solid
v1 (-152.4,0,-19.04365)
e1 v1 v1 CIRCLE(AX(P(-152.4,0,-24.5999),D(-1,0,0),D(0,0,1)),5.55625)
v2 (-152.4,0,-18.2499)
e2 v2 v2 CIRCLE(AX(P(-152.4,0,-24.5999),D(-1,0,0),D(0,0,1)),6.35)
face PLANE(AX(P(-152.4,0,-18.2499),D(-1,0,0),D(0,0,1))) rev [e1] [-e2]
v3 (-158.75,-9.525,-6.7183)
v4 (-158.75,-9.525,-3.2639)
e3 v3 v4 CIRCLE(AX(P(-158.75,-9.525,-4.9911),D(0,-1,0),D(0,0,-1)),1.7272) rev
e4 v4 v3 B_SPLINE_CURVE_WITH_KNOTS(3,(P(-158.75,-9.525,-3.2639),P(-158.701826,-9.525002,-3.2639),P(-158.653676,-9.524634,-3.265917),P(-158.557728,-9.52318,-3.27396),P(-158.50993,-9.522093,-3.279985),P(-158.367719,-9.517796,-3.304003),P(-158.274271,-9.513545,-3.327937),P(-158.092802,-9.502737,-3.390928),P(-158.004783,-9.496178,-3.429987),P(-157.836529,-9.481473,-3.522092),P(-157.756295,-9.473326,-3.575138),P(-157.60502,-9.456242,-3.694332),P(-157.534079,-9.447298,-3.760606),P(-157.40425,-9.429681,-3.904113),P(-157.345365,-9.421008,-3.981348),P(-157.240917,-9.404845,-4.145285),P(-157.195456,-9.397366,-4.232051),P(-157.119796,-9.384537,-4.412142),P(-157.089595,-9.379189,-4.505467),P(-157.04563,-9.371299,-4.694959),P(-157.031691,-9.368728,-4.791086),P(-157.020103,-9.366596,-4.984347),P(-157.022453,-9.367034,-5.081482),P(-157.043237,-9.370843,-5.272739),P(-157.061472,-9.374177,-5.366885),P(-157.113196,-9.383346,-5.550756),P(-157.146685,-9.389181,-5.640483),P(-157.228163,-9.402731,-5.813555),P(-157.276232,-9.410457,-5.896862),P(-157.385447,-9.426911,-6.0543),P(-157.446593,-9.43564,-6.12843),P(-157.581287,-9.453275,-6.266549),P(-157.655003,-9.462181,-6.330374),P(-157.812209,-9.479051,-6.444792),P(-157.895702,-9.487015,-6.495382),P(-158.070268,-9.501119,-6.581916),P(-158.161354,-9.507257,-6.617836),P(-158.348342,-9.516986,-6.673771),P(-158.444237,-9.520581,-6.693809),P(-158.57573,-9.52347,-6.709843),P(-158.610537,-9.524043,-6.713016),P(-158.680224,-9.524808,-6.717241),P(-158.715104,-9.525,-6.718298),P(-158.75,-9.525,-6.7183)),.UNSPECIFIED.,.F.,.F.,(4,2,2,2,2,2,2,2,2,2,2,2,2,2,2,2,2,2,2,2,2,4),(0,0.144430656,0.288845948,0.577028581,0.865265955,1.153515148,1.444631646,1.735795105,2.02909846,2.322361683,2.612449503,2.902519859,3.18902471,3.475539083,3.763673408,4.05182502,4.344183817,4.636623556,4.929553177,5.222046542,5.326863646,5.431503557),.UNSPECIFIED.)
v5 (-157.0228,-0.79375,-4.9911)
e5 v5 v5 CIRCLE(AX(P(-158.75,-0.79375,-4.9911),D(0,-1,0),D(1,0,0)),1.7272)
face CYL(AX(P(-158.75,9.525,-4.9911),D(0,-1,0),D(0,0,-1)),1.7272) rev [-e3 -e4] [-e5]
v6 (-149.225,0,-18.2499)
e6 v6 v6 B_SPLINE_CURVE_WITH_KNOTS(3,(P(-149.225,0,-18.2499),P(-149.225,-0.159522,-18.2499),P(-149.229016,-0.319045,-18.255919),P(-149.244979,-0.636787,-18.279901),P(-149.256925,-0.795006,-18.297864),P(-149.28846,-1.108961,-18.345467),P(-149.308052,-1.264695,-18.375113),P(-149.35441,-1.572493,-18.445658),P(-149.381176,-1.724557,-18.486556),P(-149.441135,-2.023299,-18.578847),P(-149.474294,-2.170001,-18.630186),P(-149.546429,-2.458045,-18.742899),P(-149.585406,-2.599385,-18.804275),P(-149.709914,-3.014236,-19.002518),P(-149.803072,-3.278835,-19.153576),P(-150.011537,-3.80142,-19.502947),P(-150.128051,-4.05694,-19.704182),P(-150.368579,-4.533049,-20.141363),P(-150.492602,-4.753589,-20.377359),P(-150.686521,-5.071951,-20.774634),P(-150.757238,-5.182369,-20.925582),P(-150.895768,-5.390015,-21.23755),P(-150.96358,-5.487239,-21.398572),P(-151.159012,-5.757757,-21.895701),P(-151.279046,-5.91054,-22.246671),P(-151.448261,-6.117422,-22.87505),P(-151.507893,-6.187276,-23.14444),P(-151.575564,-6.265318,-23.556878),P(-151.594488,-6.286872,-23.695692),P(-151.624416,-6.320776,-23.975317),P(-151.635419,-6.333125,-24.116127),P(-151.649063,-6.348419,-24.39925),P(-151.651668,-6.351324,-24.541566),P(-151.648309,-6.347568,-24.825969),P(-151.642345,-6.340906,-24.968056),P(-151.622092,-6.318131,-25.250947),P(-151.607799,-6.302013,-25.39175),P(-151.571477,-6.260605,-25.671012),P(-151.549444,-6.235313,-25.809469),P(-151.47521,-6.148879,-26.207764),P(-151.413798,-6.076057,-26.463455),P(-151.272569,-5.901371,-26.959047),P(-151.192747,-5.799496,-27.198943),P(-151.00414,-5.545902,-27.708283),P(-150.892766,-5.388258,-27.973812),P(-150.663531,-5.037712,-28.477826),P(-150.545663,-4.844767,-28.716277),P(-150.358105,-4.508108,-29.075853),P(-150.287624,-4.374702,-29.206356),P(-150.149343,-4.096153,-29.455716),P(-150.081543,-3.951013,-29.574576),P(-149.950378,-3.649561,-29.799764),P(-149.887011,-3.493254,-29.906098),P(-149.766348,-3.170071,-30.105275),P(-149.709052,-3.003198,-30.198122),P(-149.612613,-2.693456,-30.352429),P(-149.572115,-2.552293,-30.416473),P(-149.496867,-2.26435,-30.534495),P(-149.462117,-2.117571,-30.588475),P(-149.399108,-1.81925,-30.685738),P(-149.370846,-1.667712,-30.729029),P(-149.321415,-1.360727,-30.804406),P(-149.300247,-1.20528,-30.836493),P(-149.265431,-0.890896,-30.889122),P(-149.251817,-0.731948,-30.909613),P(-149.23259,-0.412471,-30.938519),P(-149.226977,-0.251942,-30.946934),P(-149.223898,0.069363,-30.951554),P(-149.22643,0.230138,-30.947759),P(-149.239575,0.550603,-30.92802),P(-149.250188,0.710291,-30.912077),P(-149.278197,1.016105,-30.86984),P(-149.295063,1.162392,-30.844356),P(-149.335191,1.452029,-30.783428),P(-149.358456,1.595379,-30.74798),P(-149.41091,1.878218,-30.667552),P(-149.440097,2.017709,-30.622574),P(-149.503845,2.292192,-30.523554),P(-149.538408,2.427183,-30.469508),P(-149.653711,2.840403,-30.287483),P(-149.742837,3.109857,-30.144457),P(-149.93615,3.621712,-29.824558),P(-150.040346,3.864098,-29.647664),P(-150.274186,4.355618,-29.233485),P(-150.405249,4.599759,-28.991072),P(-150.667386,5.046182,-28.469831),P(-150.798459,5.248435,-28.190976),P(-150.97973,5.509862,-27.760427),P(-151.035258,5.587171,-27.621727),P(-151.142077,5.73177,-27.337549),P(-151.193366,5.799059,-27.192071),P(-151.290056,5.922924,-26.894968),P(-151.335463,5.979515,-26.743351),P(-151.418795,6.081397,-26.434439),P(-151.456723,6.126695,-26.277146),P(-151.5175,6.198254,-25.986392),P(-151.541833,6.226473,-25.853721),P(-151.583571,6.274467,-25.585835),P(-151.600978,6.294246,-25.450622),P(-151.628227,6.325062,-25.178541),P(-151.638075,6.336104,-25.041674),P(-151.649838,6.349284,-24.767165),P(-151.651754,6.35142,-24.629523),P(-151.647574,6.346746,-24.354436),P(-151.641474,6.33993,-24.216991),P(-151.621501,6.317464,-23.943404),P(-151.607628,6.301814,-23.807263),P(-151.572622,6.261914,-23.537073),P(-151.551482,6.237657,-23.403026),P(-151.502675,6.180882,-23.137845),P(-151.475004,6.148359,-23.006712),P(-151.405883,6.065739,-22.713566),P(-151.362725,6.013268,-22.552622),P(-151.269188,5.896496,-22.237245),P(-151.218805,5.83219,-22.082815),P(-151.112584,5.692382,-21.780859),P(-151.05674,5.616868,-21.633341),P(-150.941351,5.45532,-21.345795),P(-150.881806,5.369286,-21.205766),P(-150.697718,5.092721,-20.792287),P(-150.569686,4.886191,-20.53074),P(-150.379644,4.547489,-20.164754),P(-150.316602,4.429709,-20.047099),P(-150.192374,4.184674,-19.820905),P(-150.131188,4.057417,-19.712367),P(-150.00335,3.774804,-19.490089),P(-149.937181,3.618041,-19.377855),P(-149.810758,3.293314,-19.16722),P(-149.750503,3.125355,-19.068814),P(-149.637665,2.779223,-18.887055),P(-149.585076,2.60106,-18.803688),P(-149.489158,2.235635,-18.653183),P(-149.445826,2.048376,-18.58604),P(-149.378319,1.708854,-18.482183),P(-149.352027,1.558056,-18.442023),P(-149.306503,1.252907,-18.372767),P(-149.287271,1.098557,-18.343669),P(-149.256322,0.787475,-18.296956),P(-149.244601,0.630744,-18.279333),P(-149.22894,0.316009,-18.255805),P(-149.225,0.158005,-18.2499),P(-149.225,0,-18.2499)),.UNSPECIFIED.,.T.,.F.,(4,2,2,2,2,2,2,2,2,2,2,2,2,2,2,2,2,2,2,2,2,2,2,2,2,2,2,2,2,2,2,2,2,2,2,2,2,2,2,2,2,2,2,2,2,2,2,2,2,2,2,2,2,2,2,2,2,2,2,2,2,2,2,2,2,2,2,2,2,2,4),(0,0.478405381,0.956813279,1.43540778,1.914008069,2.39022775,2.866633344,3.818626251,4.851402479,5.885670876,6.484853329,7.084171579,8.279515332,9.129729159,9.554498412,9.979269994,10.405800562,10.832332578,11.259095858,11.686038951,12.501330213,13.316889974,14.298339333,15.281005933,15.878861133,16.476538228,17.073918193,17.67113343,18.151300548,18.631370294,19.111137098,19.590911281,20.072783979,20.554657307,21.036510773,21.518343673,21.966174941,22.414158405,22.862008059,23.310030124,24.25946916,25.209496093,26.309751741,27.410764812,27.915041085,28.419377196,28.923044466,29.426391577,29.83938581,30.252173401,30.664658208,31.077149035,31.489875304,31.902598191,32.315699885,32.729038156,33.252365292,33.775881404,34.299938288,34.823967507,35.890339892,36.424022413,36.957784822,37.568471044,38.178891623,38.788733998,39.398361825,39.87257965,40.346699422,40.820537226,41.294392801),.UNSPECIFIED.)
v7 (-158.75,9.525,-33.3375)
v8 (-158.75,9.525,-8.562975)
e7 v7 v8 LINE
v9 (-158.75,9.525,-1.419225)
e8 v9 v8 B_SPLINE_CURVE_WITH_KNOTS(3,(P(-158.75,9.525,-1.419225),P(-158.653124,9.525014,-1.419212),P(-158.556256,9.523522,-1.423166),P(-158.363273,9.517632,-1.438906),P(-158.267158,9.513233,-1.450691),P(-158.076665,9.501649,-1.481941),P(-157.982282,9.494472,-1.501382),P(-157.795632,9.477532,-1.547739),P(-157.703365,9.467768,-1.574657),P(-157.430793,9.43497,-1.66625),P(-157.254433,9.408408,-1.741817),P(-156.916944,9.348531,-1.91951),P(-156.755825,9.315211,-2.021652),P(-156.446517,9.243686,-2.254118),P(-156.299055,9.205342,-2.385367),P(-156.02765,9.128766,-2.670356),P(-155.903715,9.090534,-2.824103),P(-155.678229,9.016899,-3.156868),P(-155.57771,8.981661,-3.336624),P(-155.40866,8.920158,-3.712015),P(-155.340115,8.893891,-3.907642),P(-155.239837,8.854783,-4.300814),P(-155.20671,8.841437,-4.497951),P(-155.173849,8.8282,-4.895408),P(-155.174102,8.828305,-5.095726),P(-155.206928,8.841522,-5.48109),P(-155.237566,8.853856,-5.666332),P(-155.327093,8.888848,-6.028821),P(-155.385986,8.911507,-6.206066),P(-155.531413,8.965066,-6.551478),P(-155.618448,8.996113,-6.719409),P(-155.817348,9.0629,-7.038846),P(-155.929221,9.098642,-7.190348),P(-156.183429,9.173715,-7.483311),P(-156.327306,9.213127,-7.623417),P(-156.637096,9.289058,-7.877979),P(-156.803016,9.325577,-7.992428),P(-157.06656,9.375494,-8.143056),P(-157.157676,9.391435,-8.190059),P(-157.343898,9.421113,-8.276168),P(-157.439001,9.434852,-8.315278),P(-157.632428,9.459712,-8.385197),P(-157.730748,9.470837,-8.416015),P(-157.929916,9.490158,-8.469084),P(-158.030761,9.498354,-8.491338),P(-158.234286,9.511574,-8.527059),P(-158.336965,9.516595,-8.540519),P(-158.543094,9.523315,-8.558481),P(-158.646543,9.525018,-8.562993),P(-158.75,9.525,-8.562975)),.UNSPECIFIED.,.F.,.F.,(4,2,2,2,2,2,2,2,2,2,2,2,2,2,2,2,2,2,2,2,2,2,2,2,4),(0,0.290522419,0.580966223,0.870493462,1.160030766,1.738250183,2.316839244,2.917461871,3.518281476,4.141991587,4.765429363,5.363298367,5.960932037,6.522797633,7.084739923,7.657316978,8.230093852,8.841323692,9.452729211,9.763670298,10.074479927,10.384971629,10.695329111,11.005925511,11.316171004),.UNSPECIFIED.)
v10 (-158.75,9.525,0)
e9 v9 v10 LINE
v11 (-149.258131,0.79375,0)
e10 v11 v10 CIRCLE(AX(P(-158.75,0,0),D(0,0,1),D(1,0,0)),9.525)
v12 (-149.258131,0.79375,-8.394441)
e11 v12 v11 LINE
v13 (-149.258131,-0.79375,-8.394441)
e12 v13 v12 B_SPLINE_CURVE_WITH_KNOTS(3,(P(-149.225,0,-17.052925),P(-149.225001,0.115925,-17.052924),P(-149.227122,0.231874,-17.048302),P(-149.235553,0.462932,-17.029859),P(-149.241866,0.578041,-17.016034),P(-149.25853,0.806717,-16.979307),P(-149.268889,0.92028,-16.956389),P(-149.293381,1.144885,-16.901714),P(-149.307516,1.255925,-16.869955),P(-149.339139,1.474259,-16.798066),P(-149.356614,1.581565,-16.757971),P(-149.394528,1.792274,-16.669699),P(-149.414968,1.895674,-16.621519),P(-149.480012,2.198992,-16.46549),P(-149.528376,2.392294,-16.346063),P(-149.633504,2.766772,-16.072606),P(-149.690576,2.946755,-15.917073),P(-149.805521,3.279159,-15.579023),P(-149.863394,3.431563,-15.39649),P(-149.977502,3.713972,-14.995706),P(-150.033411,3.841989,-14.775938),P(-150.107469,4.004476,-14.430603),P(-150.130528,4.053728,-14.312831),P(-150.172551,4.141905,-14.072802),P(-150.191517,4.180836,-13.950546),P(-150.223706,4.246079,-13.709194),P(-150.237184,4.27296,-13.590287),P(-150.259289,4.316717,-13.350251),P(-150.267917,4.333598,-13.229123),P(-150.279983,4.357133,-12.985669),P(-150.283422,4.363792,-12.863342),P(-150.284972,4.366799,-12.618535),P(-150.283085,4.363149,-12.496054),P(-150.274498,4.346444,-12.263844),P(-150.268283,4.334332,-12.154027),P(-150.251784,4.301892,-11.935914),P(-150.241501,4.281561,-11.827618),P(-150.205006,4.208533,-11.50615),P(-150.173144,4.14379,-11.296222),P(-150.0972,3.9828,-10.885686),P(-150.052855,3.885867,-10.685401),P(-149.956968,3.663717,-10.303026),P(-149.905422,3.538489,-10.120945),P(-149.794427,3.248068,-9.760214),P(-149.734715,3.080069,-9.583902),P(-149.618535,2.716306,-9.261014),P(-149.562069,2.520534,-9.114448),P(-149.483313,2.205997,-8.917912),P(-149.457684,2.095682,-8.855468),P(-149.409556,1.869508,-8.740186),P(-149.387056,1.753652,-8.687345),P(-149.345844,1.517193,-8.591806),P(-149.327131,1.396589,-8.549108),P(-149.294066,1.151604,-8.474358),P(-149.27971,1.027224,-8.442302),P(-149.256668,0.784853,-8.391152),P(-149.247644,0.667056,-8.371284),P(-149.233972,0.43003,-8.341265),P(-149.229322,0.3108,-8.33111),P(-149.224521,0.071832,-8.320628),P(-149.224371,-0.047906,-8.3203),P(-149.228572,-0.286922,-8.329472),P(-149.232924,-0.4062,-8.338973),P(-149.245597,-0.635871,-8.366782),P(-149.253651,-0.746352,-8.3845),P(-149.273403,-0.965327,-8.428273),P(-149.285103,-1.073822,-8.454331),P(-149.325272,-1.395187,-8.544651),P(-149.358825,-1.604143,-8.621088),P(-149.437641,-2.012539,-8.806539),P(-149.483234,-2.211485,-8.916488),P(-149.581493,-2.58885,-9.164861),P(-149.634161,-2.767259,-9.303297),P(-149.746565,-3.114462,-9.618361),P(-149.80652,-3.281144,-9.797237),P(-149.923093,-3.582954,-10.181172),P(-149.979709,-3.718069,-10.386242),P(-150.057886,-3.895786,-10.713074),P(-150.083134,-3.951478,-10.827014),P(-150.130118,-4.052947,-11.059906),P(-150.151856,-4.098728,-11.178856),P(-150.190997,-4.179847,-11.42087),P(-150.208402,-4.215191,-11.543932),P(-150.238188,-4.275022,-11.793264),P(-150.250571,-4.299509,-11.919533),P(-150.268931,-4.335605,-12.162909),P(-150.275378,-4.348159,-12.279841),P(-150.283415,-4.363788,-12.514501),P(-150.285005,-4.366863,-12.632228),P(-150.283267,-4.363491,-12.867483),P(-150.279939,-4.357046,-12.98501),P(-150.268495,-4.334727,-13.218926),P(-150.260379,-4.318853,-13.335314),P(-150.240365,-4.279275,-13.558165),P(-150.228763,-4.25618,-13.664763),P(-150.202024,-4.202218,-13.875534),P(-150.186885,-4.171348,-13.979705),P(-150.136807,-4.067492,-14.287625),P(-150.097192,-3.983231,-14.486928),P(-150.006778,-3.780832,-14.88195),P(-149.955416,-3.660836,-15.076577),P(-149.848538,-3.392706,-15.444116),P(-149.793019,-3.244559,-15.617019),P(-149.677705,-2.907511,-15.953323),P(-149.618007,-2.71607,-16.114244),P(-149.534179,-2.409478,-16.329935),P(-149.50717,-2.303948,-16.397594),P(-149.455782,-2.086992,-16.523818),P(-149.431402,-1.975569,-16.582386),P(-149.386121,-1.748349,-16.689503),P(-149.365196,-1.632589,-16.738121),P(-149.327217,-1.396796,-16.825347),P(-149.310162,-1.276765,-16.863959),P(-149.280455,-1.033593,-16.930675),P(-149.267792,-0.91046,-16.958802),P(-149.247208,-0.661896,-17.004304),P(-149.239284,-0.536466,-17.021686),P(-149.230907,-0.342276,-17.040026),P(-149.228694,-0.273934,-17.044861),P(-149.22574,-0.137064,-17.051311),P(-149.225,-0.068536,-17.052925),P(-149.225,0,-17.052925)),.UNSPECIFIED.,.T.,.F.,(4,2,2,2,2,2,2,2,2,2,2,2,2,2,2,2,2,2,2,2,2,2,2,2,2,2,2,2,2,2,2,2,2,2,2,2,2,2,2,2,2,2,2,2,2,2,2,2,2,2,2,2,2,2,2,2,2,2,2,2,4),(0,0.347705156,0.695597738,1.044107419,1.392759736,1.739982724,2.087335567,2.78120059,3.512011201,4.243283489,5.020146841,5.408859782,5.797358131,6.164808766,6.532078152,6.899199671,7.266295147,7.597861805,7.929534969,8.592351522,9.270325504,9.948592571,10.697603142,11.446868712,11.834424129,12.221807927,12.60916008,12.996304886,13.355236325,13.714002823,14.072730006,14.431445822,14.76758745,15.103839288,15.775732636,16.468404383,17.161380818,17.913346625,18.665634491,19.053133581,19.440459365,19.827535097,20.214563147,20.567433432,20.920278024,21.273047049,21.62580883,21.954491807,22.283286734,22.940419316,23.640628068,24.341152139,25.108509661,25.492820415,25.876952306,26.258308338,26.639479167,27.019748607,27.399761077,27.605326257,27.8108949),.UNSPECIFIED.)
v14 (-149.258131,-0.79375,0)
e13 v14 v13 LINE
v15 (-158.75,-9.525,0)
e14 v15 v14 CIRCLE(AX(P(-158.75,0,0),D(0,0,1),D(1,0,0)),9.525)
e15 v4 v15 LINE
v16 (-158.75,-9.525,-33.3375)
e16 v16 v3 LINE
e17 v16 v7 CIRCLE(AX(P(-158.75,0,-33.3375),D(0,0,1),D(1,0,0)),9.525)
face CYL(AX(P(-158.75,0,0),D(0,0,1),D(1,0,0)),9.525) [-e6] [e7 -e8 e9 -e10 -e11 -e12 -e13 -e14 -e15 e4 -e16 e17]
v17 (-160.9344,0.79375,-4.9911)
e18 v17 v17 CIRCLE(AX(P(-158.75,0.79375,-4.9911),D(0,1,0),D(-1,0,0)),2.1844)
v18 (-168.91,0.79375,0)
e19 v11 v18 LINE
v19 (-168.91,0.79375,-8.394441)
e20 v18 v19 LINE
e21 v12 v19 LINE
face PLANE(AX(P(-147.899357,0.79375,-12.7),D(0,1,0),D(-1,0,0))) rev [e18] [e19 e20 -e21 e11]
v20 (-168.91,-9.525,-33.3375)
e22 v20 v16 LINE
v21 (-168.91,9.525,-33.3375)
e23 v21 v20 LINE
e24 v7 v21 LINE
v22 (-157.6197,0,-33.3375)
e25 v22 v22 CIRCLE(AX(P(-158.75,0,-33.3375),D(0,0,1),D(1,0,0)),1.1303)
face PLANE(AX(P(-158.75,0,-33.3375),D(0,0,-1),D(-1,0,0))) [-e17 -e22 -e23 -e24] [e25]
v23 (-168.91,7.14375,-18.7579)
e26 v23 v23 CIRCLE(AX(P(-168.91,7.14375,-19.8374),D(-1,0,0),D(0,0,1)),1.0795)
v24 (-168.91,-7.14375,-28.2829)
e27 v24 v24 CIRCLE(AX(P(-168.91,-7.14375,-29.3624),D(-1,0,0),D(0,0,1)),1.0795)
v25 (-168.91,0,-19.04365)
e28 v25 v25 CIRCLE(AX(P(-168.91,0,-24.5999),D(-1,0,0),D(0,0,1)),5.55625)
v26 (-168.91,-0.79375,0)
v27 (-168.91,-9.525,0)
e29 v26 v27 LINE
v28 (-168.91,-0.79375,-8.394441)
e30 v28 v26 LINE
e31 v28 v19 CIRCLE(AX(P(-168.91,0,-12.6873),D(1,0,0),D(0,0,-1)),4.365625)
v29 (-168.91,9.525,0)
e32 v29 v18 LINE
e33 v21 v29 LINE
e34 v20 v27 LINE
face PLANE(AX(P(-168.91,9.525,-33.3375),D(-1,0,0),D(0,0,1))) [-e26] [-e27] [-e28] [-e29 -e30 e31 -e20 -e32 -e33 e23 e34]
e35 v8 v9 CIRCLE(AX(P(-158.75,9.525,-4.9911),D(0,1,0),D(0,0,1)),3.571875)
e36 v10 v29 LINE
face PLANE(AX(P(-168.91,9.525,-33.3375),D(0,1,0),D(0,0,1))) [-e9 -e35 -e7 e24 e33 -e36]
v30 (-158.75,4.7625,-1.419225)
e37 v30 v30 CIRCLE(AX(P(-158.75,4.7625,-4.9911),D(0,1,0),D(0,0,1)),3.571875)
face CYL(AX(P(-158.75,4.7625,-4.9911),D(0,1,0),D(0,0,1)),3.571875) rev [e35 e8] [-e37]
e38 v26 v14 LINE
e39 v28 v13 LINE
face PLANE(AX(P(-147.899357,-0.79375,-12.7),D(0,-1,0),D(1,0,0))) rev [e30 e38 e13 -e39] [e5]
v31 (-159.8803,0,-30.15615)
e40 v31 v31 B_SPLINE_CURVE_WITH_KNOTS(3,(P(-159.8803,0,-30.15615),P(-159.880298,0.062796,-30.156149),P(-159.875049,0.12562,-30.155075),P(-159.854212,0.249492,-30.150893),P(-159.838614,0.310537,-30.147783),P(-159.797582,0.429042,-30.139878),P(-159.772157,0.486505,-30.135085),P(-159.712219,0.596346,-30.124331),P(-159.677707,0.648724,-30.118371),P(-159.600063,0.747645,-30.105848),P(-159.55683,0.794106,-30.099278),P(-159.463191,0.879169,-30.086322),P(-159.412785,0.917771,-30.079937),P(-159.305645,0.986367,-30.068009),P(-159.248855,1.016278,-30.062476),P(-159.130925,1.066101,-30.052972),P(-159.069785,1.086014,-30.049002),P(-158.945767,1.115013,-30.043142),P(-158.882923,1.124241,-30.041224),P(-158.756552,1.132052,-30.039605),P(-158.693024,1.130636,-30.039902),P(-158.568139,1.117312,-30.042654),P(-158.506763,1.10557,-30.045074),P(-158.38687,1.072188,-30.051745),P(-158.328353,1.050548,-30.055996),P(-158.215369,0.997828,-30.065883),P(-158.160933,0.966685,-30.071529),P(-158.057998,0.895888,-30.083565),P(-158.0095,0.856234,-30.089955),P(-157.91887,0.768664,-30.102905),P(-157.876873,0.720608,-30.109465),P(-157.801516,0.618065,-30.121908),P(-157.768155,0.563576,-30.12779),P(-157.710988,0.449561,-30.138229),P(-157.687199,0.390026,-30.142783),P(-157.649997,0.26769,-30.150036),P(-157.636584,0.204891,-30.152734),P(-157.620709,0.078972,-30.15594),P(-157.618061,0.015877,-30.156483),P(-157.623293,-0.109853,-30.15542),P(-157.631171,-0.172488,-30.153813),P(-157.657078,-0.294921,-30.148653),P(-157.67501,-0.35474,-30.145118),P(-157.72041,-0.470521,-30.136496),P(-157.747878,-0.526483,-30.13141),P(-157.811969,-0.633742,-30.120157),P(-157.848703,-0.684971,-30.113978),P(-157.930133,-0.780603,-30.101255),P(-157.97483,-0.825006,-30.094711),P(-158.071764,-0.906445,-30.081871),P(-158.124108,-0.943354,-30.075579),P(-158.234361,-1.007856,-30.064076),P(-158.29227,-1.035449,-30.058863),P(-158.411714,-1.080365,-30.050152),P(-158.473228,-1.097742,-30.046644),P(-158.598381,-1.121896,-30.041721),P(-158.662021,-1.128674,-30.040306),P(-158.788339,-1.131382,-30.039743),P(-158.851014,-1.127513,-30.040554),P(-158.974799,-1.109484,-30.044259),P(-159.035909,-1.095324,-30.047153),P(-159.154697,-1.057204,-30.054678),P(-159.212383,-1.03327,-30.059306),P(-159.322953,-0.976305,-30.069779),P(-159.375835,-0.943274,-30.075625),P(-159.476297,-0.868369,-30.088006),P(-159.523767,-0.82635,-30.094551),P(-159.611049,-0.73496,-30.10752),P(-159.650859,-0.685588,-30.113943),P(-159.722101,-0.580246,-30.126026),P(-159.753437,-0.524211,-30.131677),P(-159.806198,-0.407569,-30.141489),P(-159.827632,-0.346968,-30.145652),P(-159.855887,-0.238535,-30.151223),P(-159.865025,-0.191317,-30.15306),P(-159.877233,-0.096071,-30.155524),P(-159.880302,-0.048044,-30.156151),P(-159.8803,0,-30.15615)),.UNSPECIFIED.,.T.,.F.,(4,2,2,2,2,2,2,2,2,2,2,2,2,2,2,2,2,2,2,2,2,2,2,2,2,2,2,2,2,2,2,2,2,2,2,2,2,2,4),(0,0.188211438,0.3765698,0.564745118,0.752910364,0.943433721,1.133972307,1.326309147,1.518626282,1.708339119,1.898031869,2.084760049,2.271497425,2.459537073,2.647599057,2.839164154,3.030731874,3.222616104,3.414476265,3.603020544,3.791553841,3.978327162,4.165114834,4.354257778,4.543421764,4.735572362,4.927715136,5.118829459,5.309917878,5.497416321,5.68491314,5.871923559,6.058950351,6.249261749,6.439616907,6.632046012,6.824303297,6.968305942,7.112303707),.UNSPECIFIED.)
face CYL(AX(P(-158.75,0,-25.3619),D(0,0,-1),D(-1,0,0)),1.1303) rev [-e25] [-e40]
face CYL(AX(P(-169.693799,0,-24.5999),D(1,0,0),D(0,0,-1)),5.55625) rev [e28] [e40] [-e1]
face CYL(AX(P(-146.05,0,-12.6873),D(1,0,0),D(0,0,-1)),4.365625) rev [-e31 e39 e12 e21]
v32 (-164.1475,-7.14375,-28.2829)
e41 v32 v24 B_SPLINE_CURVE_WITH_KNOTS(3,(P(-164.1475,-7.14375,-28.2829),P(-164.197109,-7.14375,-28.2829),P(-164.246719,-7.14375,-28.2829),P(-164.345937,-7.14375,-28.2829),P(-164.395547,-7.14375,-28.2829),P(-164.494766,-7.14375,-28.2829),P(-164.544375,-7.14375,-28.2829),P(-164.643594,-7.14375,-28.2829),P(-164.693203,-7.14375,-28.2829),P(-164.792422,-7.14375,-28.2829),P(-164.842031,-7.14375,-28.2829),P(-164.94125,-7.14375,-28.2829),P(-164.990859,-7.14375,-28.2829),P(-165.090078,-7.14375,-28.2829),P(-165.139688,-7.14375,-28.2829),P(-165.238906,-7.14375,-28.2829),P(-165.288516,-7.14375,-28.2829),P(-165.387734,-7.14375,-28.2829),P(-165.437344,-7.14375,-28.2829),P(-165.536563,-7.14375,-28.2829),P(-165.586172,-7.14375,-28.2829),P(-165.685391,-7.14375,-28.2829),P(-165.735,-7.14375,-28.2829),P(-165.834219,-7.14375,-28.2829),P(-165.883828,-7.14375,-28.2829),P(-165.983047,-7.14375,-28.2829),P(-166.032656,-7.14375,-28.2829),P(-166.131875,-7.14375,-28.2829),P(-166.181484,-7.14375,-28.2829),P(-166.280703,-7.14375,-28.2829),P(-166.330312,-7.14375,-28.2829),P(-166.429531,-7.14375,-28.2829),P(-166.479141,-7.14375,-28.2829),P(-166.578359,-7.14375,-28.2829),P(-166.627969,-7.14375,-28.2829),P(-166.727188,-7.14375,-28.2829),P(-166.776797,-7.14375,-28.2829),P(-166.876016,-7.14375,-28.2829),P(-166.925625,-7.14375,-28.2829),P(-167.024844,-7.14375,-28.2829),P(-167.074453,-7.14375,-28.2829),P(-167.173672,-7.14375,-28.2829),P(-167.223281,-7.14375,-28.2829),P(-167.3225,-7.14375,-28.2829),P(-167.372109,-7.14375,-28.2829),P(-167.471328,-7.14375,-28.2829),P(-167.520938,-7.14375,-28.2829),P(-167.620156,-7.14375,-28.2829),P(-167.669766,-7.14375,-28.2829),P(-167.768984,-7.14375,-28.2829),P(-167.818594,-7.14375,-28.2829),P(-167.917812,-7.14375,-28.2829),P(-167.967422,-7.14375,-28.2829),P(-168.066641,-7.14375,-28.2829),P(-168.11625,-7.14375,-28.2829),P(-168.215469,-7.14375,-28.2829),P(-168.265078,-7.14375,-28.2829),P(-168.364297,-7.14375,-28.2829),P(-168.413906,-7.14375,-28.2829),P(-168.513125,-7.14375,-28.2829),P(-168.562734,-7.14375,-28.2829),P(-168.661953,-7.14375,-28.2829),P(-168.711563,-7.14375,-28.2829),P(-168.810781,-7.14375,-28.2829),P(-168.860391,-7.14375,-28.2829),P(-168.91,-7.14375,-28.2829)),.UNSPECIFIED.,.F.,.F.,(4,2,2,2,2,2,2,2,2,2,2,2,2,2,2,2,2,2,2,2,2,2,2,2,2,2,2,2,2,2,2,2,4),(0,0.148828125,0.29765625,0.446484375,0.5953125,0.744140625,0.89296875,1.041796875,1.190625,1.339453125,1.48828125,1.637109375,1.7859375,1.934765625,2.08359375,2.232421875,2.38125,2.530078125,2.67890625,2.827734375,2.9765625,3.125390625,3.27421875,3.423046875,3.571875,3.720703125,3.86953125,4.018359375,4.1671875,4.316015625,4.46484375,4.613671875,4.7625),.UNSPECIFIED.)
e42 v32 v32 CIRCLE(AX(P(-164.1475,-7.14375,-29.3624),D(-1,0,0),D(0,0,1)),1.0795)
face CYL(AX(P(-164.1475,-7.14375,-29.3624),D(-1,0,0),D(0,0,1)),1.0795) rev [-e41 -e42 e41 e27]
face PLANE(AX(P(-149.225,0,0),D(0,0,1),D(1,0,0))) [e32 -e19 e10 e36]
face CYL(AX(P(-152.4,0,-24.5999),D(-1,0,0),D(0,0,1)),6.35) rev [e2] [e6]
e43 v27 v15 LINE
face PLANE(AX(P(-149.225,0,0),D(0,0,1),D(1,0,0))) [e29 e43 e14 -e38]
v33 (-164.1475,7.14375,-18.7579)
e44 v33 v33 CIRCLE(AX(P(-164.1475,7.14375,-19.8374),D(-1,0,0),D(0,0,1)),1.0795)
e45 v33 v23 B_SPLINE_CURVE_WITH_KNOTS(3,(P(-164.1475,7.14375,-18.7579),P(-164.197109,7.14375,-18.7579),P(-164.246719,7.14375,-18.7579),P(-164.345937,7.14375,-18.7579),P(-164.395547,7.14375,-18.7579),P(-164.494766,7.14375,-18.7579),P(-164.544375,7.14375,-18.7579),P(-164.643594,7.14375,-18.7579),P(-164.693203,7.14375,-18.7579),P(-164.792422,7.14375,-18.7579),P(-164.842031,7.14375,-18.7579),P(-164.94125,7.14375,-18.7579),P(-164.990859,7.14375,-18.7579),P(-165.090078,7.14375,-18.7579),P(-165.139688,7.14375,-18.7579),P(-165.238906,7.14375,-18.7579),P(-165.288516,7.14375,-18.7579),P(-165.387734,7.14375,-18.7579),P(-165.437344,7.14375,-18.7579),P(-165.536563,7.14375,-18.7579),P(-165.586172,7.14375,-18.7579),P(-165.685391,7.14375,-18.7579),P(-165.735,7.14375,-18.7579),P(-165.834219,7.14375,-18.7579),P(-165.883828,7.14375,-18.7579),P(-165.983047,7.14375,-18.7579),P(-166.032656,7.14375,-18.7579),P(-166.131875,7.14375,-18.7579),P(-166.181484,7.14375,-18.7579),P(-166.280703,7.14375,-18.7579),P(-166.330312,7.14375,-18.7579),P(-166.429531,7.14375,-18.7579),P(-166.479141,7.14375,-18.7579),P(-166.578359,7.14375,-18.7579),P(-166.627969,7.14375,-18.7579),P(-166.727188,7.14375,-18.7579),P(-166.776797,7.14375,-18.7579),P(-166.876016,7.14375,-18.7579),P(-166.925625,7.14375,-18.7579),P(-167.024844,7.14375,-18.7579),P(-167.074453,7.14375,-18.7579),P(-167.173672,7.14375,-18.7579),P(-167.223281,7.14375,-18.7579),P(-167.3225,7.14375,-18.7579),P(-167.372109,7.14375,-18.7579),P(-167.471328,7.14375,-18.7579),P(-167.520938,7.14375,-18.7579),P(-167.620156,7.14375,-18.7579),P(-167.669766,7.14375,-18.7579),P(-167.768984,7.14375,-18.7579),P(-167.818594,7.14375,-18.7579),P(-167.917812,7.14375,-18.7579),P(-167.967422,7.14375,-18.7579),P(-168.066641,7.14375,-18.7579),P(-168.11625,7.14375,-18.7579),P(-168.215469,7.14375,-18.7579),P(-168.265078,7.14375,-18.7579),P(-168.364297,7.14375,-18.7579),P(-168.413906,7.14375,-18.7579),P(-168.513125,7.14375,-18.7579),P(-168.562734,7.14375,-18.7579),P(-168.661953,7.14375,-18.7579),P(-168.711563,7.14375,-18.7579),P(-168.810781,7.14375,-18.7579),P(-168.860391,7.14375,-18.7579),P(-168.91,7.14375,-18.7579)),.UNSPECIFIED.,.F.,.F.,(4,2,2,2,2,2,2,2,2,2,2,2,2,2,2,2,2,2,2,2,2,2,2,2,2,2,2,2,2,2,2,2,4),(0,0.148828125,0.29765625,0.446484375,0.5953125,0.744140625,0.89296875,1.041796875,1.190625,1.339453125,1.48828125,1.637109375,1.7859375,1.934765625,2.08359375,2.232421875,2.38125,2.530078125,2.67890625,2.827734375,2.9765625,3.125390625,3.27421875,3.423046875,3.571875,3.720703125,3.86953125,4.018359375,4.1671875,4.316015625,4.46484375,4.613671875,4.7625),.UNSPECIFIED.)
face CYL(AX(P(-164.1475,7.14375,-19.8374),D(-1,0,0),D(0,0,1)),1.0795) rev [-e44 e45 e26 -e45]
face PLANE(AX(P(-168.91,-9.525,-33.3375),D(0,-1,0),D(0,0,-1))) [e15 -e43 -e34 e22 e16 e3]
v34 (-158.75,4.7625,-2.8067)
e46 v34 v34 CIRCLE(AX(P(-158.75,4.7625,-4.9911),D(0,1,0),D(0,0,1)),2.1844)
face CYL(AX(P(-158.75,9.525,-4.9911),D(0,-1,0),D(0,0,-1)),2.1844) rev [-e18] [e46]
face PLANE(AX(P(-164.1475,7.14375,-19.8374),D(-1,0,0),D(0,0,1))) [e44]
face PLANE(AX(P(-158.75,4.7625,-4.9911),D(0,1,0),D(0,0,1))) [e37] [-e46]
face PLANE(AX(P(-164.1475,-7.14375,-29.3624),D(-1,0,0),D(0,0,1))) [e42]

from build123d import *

# Parameters (mm, degrees)
SKETCH1_W              = 9.525
SKETCH1_H              = 33.3375
COMBINE1_START         = -168.91
COMBINE1_OUTLINE_R     = 5.55625
COMBINE1_DEPTH         = 20.91
COMBINE1_START_2       = -152.4
COMBINE1_2_OUTLINE_R   = 6.35
COMBINE1_2_OUTLINE_R_2 = 5.55625
COMBINE1_2_DEPTH       = 4.4
COMBINE1_START_3       = -166.890966931
COMBINE1_3_OUTLINE_R   = 1.0795
COMBINE1_3_DEPTH       = 2.743466931
COMBINE1_4_OUTLINE_R   = 1.0795
COMBINE1_4_OUTLINE_R_2 = 6.35
COMBINE1_4_DEPTH       = 10.107803
COMBINE1_5_OUTLINE_R   = 6.35
COMBINE1_5_OUTLINE_R_2 = 5.55625
COMBINE1_5_DEPTH       = 4.7625
COMBINE1_START_4       = -164.1475
COMBINE1_6_OUTLINE_R   = 1.0795
COMBINE1_6_DEPTH       = 1.8256249
COMBINE1_START_5       = 4.7625
COMBINE1_7_OUTLINE_R   = 3.571875
COMBINE1_7_DEPTH       = 4.7625
COMBINE1_START_6       = -11
COMBINE1_8_OUTLINE_R   = 1.7272
COMBINE1_8_DEPTH       = 15.7625
COMBINE1_START_7       = 0.793749963
COMBINE1_9_OUTLINE_R   = 2.1844
COMBINE1_9_OUTLINE_R_2 = 1.7272
COMBINE1_9_DEPTH       = 3.968750037
COMBINE1_START_8       = -33.3375
COMBINE1_10_OUTLINE_R  = 1.1303
COMBINE1_10_DEPTH      = 3.297532088


with BuildPart() as part:
    # Sketch1 → Revolve1 (revolve)
    with BuildSketch(Plane(origin=(0, 0, 0), x_dir=(1, 0, 0), z_dir=(0, 1, 0))):
        with Locations((-153.9875, 16.66875)):
            Rectangle(SKETCH1_W, SKETCH1_H)
    revolve(axis=Axis((-158.75, 0, 0), (0, 0, -1)))

    # Combine1: read off the stored shape, not the designer's step
    # Combine1 outline → Combine1 (cut)
    with BuildSketch(Plane.YZ.offset(COMBINE1_START)):
        with BuildLine():
            Line((0.79375, 0), (-0.79375, 0))
            Line((-0.79375, 0), (-0.793749936, -8.394440501))
            ThreePointArc((-0.793749936, -8.394440501), (-1e-08, -17.052925), (0.793749959, -8.394440505))
            Line((0.793749959, -8.394440505), (0.79375, 0))
        make_face()
        with Locations((0, -24.5999)):
            Circle(COMBINE1_OUTLINE_R)
    extrude(amount=COMBINE1_DEPTH, mode=Mode.SUBTRACT)

    # Combine1 2 outline → Combine1 2 (cut)
    with BuildSketch(Plane.YZ.offset(COMBINE1_START_2)):
        with Locations((0, -24.5999)):
            Circle(COMBINE1_2_OUTLINE_R)
        with Locations((0, -24.5999)):
            Circle(COMBINE1_2_OUTLINE_R_2, mode=Mode.SUBTRACT)
    extrude(amount=COMBINE1_2_DEPTH, mode=Mode.SUBTRACT)

    # Combine1 3 outline → Combine1 3 (cut)
    with BuildSketch(Plane.YZ.offset(COMBINE1_START_3)):
        with Locations((7.14375, -19.8374)):
            Circle(COMBINE1_3_OUTLINE_R)
        with Locations((-7.14375, -29.3624)):
            Circle(COMBINE1_3_OUTLINE_R)
    extrude(amount=COMBINE1_3_DEPTH, mode=Mode.SUBTRACT)

    # Combine1 4 outline → Combine1 4 (add)
    with BuildSketch(Plane.YZ.offset(COMBINE1_START)):
        with BuildLine():
            Line((-9.525, 0), (-9.525, -33.3375))
            Line((-9.525, -33.3375), (9.525, -33.3375))
            Line((9.525, -33.3375), (9.525, 0))
            Line((9.525, 0), (0.79375, 0))
            Line((0.79375, 0), (0.793749959, -8.394440505))
            ThreePointArc((0.793749959, -8.394440505), (-1e-08, -17.052925), (-0.793749936, -8.394440501))
            Line((-0.793749936, -8.394440501), (-0.79375, 0))
            Line((-0.79375, 0), (-9.525, 0))
        make_face()
        with Locations((-7.14375, -29.3624)):
            Circle(COMBINE1_4_OUTLINE_R, mode=Mode.SUBTRACT)
        with Locations((0, -24.5999)):
            Circle(COMBINE1_4_OUTLINE_R_2, mode=Mode.SUBTRACT)
        with Locations((7.14375, -19.8374)):
            Circle(COMBINE1_4_OUTLINE_R, mode=Mode.SUBTRACT)
    extrude(amount=COMBINE1_4_DEPTH)

    # Combine1 5 outline → Combine1 5 (add)
    with BuildSketch(Plane.YZ.offset(COMBINE1_START)):
        with Locations((0, -24.5999)):
            Circle(COMBINE1_5_OUTLINE_R)
        with Locations((0, -24.5999)):
            Circle(COMBINE1_5_OUTLINE_R_2, mode=Mode.SUBTRACT)
    extrude(amount=COMBINE1_5_DEPTH)

    # Combine1 6 outline → Combine1 6 (add)
    with BuildSketch(Plane.YZ.offset(COMBINE1_START_4)):
        with Locations((7.14375, -19.8374)):
            Circle(COMBINE1_6_OUTLINE_R)
        with Locations((-7.14375, -29.3624)):
            Circle(COMBINE1_6_OUTLINE_R)
    extrude(amount=COMBINE1_6_DEPTH)

    # Combine1 7 outline → Combine1 7 (cut)
    with BuildSketch(Plane(origin=(0, 0, 0), x_dir=(1, 0, 0), z_dir=(0, 1, 0)).offset(COMBINE1_START_5)):
        with Locations((-158.75, 4.9911)):
            Circle(COMBINE1_7_OUTLINE_R)
    extrude(amount=COMBINE1_7_DEPTH, mode=Mode.SUBTRACT)

    # Combine1 8 outline → Combine1 8 (cut)
    with BuildSketch(Plane(origin=(0, 0, 0), x_dir=(1, 0, 0), z_dir=(0, 1, 0)).offset(COMBINE1_START_6)):
        with Locations((-158.75, 4.9911)):
            Circle(COMBINE1_8_OUTLINE_R)
    extrude(amount=COMBINE1_8_DEPTH, mode=Mode.SUBTRACT)

    # Combine1 9 outline → Combine1 9 (cut)
    with BuildSketch(Plane(origin=(0, 0, 0), x_dir=(1, 0, 0), z_dir=(0, 1, 0)).offset(COMBINE1_START_7)):
        with Locations((-158.75, 4.9911)):
            Circle(COMBINE1_9_OUTLINE_R)
        with Locations((-158.75, 4.9911)):
            Circle(COMBINE1_9_OUTLINE_R_2, mode=Mode.SUBTRACT)
    extrude(amount=COMBINE1_9_DEPTH, mode=Mode.SUBTRACT)

    # Combine1 10 outline → Combine1 10 (cut)
    with BuildSketch(Plane.XY.offset(COMBINE1_START_8)):
        with Locations((-158.75, 0)):
            Circle(COMBINE1_10_OUTLINE_R)
    extrude(amount=COMBINE1_10_DEPTH, mode=Mode.SUBTRACT)


solid = part.part
